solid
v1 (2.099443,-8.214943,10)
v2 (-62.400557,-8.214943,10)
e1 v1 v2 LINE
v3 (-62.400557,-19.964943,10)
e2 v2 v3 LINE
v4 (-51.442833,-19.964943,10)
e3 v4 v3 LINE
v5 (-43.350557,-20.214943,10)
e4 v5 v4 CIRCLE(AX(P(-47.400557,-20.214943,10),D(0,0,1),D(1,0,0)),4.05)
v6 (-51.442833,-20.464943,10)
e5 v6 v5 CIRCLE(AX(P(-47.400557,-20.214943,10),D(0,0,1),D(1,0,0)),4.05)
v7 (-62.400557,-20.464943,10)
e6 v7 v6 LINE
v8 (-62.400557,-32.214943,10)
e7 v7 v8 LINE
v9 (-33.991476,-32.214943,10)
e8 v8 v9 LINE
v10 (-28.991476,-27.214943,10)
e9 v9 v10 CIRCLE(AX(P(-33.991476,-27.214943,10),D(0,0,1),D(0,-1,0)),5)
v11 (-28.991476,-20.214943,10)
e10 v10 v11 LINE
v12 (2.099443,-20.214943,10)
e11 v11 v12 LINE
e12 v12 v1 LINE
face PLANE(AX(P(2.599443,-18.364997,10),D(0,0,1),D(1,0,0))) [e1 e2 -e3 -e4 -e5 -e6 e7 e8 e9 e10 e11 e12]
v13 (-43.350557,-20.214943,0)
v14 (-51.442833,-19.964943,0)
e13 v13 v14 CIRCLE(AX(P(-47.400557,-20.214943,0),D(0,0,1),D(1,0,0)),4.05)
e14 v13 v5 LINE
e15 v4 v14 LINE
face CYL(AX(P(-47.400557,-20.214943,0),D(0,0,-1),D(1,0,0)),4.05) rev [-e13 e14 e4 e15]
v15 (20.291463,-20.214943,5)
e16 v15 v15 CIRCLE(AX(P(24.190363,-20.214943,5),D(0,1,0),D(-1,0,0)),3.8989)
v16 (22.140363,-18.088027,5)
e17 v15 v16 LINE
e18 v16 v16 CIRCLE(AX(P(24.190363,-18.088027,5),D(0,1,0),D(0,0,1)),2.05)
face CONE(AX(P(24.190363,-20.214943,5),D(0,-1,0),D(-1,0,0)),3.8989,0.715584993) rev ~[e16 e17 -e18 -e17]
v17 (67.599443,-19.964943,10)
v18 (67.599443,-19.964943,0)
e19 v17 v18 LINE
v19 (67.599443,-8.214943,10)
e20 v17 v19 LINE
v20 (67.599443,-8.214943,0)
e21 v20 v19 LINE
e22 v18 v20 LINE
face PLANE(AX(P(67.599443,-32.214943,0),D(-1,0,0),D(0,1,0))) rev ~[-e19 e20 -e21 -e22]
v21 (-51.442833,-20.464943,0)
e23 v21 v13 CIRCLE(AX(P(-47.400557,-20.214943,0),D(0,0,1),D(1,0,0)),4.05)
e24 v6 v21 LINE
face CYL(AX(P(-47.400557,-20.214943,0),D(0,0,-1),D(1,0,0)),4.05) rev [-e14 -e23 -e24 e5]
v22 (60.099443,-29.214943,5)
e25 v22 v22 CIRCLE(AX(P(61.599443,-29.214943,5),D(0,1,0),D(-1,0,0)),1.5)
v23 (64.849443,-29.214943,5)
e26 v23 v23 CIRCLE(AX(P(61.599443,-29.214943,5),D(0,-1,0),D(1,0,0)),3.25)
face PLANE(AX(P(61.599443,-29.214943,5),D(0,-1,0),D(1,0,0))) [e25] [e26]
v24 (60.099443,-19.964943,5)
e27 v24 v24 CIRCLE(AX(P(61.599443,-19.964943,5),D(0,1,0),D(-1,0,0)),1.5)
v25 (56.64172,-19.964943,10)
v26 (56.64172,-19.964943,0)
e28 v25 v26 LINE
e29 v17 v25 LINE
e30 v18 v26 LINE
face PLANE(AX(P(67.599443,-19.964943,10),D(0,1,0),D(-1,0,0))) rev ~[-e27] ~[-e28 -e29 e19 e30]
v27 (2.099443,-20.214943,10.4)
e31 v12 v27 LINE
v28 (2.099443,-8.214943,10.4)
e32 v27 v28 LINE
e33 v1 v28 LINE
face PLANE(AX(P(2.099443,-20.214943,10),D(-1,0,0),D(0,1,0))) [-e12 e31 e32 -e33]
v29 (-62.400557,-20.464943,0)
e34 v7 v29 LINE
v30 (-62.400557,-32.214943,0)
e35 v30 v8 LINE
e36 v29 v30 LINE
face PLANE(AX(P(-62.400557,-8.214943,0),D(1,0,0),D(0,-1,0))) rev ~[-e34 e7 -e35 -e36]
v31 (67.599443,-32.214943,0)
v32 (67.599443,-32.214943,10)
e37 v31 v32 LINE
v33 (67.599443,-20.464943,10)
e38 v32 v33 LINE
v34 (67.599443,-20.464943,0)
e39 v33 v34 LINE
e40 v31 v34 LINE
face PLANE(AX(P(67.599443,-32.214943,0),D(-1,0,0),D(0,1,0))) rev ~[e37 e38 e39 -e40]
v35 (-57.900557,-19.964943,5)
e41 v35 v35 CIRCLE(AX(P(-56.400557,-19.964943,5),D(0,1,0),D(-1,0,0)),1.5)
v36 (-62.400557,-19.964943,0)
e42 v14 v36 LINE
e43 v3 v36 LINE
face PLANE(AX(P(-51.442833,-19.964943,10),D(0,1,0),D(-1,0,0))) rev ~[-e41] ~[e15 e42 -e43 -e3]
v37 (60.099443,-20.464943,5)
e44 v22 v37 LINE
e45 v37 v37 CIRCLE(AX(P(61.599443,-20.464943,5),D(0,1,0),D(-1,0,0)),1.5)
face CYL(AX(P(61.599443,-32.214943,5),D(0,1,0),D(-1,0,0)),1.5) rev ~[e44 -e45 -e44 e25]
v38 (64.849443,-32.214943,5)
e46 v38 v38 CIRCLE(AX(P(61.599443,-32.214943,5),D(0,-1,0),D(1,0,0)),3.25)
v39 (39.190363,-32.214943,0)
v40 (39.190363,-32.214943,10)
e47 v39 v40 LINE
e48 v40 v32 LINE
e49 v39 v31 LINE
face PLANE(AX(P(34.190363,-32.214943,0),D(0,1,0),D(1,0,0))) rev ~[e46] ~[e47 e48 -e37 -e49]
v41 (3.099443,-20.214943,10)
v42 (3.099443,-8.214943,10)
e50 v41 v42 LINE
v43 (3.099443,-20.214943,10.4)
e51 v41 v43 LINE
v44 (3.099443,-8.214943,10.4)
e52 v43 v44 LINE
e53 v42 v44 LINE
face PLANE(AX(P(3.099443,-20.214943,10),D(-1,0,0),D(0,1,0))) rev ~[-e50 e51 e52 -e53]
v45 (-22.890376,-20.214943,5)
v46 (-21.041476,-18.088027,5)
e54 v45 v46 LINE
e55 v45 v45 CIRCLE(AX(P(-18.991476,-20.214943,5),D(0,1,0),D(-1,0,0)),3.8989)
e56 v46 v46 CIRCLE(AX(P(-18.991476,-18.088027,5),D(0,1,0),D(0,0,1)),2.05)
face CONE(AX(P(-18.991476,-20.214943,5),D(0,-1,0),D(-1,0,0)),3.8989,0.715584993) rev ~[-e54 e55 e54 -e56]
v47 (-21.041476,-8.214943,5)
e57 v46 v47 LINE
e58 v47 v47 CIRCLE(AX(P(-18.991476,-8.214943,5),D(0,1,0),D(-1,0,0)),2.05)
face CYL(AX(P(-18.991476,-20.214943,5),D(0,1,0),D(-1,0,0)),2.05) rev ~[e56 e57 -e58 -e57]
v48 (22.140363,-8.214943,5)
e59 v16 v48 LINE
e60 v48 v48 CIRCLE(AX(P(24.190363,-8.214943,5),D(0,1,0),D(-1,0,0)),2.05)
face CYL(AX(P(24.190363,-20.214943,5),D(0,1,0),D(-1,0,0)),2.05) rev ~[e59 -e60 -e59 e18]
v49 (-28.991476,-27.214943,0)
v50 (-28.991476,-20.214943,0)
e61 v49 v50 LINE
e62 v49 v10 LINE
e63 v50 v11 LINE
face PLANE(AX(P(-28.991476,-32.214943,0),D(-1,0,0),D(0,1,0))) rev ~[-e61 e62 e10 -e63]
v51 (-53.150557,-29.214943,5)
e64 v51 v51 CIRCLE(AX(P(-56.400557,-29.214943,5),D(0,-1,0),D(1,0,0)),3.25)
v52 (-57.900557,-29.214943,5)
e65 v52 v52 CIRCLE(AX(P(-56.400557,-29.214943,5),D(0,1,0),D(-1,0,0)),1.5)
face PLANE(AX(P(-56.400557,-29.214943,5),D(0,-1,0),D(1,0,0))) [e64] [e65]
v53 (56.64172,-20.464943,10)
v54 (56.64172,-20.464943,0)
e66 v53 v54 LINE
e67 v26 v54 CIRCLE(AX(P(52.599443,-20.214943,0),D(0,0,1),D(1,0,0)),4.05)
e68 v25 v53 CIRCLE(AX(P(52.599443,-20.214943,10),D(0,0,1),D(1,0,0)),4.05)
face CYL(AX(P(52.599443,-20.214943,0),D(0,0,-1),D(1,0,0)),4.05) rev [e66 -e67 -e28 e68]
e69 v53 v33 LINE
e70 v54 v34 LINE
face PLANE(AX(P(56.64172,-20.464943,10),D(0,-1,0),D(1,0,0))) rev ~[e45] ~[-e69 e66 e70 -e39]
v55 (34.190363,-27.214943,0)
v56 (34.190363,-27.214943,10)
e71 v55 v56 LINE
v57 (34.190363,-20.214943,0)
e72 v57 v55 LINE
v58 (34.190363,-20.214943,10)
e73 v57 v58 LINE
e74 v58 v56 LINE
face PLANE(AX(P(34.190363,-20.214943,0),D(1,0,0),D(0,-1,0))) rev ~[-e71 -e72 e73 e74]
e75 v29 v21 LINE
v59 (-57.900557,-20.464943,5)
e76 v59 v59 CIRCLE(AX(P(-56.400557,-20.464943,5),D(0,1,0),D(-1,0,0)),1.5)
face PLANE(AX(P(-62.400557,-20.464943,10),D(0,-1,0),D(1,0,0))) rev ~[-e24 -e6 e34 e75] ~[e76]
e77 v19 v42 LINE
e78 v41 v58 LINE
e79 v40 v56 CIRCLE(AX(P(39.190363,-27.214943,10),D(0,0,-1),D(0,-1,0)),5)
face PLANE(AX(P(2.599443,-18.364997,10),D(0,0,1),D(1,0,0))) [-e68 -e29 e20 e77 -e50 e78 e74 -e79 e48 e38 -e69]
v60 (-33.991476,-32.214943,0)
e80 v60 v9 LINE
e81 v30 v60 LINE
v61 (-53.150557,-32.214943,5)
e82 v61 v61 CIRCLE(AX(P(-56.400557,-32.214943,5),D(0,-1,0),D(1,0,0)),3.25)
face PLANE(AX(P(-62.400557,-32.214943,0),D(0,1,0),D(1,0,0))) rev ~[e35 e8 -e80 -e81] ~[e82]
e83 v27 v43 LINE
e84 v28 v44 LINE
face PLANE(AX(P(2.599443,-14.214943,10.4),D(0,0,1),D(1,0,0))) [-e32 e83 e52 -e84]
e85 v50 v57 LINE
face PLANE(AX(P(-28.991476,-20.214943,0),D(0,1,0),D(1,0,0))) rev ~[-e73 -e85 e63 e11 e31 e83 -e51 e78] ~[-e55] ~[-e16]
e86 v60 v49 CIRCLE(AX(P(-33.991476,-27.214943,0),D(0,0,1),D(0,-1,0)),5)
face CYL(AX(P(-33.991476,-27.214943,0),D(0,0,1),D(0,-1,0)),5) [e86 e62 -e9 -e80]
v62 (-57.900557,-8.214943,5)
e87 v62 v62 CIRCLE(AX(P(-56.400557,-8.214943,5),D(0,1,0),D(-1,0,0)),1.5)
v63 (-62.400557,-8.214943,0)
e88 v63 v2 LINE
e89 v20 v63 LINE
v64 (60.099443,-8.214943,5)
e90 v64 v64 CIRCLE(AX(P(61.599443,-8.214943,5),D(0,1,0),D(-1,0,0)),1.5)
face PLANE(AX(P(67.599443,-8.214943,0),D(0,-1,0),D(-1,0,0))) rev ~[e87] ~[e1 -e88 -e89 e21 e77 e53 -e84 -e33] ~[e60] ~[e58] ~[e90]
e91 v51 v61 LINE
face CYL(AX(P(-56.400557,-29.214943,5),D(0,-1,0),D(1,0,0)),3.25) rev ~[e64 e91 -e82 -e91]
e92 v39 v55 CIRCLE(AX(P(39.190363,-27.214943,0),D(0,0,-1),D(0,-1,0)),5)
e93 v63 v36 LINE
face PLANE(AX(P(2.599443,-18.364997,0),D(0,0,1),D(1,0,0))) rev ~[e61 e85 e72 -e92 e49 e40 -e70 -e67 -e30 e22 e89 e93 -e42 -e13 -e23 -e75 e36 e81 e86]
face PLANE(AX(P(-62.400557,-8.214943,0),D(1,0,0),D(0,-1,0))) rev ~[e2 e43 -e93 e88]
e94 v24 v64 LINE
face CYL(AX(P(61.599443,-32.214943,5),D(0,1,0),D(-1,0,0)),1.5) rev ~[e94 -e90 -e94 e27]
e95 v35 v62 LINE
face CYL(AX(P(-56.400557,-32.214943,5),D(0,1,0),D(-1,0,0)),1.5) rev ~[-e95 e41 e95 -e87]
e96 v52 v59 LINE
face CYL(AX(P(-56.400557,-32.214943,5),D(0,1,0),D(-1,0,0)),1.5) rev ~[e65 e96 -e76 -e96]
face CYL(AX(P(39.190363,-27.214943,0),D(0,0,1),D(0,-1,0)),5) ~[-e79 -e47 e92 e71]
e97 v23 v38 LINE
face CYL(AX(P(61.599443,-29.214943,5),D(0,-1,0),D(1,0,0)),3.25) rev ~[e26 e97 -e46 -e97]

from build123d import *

# Parameters (mm, degrees)
F0_R            = 4.05
F1_DEPTH        = 10
F2_R            = 5
F4_D            = 4.1000000042
F4_CSINK_D      = 7.7978
F4_CSINK_ANGLE  = 82
F5_W            = 1
F5_H            = 12
F6_DEPTH        = 0.4
F8_DEPTH        = 25
F10_D           = 3
F10_CBORE_D     = 6.5
F10_CBORE_DEPTH = 3


with BuildPart() as f1:
    # F0 (on Top) → F1 (new body)
    with BuildSketch(Plane.XY):
        Polygon((67.5994434953, -8.2149432153), (-62.4005565047, -8.2149432153), (-62.4005565047, -32.2149432153), (-28.9914757013, -32.2149432153), (-28.9914757013, -20.2149432153), (34.1903626919, -20.2149432153), (34.1903626919, -32.2149432153), (67.5994434953, -32.2149432153), align=None)
        with Locations((-47.4005565047, -20.2149432153)):
            Circle(F0_R, mode=Mode.SUBTRACT)
        with Locations((52.5994434953, -20.2149432153)):
            Circle(F0_R, mode=Mode.SUBTRACT)
    extrude(amount=F1_DEPTH)

    # F2
    f2_edges = [f1.edges().sort_by_distance(p)[0] for p in [
        (34.190363, -32.214943, 5),
        (-28.991476, -32.214943, 5),
    ]]
    fillet(f2_edges, radius=F2_R)

    # F4 (through all)
    with Locations(Plane.XZ.offset(20.2149432153)):
        with Locations((-18.9914757013, 5), (24.1903626919, 5)):
            CounterSinkHole(F4_D / 2, F4_CSINK_D / 2, counter_sink_angle=F4_CSINK_ANGLE)

    # F5 (on face) → F6 (join)
    with BuildSketch(Plane.XY.offset(10)):
        with Locations((2.5994434953, -14.2149432153)):
            Rectangle(F5_W, F5_H)
    extrude(amount=F6_DEPTH)

    # F7 (on face) → F8 (cut)
    with BuildSketch(Plane.XY.offset(10)):
        with BuildLine():
            ThreePointArc((56.6417200816, -19.9649432153), (56.6475121814, -20.0898835784), (56.6494434953, -20.2149432153))
            ThreePointArc((56.6494434953, -20.2149432153), (56.6475121814, -20.3400028521), (56.6417200816, -20.4649432153))
            Line((56.6417200816, -20.4649432153), (67.5994434953, -20.4649432153))
            Line((67.5994434953, -20.4649432153), (67.5994434953, -19.9649432153))
            Line((67.5994434953, -19.9649432153), (56.6417200816, -19.9649432153))
        make_face()
        with BuildLine():
            Line((-51.442833091, -19.9649432153), (-62.4005565047, -19.9649432153))
            Line((-62.4005565047, -19.9649432153), (-62.4005565047, -20.4649432153))
            Line((-62.4005565047, -20.4649432153), (-51.442833091, -20.4649432153))
            ThreePointArc((-51.442833091, -20.4649432153), (-51.4505565047, -20.2149432153), (-51.442833091, -19.9649432153))
        make_face()
        with BuildLine():
            Line((-51.442833091, -20.4649432153), (-51.442833091, -19.9649432153))
            ThreePointArc((-51.442833091, -19.9649432153), (-51.4505565047, -20.2149432153), (-51.442833091, -20.4649432153))
        make_face()
        with BuildLine():
            ThreePointArc((56.6417200816, -20.4649432153), (56.6475121814, -20.3400028521), (56.6494434953, -20.2149432153))
            ThreePointArc((56.6494434953, -20.2149432153), (56.6475121814, -20.0898835784), (56.6417200816, -19.9649432153))
            Line((56.6417200816, -19.9649432153), (56.6417200816, -20.4649432153))
        make_face()
    extrude(amount=-F8_DEPTH, mode=Mode.SUBTRACT)

    # F10 (through all)
    with Locations(Plane.XZ.offset(32.2149432153)):
        with Locations((61.5994434953, 5), (-56.4005565047, 5)):
            CounterBoreHole(F10_D / 2, F10_CBORE_D / 2, F10_CBORE_DEPTH)


solid = f1.part
